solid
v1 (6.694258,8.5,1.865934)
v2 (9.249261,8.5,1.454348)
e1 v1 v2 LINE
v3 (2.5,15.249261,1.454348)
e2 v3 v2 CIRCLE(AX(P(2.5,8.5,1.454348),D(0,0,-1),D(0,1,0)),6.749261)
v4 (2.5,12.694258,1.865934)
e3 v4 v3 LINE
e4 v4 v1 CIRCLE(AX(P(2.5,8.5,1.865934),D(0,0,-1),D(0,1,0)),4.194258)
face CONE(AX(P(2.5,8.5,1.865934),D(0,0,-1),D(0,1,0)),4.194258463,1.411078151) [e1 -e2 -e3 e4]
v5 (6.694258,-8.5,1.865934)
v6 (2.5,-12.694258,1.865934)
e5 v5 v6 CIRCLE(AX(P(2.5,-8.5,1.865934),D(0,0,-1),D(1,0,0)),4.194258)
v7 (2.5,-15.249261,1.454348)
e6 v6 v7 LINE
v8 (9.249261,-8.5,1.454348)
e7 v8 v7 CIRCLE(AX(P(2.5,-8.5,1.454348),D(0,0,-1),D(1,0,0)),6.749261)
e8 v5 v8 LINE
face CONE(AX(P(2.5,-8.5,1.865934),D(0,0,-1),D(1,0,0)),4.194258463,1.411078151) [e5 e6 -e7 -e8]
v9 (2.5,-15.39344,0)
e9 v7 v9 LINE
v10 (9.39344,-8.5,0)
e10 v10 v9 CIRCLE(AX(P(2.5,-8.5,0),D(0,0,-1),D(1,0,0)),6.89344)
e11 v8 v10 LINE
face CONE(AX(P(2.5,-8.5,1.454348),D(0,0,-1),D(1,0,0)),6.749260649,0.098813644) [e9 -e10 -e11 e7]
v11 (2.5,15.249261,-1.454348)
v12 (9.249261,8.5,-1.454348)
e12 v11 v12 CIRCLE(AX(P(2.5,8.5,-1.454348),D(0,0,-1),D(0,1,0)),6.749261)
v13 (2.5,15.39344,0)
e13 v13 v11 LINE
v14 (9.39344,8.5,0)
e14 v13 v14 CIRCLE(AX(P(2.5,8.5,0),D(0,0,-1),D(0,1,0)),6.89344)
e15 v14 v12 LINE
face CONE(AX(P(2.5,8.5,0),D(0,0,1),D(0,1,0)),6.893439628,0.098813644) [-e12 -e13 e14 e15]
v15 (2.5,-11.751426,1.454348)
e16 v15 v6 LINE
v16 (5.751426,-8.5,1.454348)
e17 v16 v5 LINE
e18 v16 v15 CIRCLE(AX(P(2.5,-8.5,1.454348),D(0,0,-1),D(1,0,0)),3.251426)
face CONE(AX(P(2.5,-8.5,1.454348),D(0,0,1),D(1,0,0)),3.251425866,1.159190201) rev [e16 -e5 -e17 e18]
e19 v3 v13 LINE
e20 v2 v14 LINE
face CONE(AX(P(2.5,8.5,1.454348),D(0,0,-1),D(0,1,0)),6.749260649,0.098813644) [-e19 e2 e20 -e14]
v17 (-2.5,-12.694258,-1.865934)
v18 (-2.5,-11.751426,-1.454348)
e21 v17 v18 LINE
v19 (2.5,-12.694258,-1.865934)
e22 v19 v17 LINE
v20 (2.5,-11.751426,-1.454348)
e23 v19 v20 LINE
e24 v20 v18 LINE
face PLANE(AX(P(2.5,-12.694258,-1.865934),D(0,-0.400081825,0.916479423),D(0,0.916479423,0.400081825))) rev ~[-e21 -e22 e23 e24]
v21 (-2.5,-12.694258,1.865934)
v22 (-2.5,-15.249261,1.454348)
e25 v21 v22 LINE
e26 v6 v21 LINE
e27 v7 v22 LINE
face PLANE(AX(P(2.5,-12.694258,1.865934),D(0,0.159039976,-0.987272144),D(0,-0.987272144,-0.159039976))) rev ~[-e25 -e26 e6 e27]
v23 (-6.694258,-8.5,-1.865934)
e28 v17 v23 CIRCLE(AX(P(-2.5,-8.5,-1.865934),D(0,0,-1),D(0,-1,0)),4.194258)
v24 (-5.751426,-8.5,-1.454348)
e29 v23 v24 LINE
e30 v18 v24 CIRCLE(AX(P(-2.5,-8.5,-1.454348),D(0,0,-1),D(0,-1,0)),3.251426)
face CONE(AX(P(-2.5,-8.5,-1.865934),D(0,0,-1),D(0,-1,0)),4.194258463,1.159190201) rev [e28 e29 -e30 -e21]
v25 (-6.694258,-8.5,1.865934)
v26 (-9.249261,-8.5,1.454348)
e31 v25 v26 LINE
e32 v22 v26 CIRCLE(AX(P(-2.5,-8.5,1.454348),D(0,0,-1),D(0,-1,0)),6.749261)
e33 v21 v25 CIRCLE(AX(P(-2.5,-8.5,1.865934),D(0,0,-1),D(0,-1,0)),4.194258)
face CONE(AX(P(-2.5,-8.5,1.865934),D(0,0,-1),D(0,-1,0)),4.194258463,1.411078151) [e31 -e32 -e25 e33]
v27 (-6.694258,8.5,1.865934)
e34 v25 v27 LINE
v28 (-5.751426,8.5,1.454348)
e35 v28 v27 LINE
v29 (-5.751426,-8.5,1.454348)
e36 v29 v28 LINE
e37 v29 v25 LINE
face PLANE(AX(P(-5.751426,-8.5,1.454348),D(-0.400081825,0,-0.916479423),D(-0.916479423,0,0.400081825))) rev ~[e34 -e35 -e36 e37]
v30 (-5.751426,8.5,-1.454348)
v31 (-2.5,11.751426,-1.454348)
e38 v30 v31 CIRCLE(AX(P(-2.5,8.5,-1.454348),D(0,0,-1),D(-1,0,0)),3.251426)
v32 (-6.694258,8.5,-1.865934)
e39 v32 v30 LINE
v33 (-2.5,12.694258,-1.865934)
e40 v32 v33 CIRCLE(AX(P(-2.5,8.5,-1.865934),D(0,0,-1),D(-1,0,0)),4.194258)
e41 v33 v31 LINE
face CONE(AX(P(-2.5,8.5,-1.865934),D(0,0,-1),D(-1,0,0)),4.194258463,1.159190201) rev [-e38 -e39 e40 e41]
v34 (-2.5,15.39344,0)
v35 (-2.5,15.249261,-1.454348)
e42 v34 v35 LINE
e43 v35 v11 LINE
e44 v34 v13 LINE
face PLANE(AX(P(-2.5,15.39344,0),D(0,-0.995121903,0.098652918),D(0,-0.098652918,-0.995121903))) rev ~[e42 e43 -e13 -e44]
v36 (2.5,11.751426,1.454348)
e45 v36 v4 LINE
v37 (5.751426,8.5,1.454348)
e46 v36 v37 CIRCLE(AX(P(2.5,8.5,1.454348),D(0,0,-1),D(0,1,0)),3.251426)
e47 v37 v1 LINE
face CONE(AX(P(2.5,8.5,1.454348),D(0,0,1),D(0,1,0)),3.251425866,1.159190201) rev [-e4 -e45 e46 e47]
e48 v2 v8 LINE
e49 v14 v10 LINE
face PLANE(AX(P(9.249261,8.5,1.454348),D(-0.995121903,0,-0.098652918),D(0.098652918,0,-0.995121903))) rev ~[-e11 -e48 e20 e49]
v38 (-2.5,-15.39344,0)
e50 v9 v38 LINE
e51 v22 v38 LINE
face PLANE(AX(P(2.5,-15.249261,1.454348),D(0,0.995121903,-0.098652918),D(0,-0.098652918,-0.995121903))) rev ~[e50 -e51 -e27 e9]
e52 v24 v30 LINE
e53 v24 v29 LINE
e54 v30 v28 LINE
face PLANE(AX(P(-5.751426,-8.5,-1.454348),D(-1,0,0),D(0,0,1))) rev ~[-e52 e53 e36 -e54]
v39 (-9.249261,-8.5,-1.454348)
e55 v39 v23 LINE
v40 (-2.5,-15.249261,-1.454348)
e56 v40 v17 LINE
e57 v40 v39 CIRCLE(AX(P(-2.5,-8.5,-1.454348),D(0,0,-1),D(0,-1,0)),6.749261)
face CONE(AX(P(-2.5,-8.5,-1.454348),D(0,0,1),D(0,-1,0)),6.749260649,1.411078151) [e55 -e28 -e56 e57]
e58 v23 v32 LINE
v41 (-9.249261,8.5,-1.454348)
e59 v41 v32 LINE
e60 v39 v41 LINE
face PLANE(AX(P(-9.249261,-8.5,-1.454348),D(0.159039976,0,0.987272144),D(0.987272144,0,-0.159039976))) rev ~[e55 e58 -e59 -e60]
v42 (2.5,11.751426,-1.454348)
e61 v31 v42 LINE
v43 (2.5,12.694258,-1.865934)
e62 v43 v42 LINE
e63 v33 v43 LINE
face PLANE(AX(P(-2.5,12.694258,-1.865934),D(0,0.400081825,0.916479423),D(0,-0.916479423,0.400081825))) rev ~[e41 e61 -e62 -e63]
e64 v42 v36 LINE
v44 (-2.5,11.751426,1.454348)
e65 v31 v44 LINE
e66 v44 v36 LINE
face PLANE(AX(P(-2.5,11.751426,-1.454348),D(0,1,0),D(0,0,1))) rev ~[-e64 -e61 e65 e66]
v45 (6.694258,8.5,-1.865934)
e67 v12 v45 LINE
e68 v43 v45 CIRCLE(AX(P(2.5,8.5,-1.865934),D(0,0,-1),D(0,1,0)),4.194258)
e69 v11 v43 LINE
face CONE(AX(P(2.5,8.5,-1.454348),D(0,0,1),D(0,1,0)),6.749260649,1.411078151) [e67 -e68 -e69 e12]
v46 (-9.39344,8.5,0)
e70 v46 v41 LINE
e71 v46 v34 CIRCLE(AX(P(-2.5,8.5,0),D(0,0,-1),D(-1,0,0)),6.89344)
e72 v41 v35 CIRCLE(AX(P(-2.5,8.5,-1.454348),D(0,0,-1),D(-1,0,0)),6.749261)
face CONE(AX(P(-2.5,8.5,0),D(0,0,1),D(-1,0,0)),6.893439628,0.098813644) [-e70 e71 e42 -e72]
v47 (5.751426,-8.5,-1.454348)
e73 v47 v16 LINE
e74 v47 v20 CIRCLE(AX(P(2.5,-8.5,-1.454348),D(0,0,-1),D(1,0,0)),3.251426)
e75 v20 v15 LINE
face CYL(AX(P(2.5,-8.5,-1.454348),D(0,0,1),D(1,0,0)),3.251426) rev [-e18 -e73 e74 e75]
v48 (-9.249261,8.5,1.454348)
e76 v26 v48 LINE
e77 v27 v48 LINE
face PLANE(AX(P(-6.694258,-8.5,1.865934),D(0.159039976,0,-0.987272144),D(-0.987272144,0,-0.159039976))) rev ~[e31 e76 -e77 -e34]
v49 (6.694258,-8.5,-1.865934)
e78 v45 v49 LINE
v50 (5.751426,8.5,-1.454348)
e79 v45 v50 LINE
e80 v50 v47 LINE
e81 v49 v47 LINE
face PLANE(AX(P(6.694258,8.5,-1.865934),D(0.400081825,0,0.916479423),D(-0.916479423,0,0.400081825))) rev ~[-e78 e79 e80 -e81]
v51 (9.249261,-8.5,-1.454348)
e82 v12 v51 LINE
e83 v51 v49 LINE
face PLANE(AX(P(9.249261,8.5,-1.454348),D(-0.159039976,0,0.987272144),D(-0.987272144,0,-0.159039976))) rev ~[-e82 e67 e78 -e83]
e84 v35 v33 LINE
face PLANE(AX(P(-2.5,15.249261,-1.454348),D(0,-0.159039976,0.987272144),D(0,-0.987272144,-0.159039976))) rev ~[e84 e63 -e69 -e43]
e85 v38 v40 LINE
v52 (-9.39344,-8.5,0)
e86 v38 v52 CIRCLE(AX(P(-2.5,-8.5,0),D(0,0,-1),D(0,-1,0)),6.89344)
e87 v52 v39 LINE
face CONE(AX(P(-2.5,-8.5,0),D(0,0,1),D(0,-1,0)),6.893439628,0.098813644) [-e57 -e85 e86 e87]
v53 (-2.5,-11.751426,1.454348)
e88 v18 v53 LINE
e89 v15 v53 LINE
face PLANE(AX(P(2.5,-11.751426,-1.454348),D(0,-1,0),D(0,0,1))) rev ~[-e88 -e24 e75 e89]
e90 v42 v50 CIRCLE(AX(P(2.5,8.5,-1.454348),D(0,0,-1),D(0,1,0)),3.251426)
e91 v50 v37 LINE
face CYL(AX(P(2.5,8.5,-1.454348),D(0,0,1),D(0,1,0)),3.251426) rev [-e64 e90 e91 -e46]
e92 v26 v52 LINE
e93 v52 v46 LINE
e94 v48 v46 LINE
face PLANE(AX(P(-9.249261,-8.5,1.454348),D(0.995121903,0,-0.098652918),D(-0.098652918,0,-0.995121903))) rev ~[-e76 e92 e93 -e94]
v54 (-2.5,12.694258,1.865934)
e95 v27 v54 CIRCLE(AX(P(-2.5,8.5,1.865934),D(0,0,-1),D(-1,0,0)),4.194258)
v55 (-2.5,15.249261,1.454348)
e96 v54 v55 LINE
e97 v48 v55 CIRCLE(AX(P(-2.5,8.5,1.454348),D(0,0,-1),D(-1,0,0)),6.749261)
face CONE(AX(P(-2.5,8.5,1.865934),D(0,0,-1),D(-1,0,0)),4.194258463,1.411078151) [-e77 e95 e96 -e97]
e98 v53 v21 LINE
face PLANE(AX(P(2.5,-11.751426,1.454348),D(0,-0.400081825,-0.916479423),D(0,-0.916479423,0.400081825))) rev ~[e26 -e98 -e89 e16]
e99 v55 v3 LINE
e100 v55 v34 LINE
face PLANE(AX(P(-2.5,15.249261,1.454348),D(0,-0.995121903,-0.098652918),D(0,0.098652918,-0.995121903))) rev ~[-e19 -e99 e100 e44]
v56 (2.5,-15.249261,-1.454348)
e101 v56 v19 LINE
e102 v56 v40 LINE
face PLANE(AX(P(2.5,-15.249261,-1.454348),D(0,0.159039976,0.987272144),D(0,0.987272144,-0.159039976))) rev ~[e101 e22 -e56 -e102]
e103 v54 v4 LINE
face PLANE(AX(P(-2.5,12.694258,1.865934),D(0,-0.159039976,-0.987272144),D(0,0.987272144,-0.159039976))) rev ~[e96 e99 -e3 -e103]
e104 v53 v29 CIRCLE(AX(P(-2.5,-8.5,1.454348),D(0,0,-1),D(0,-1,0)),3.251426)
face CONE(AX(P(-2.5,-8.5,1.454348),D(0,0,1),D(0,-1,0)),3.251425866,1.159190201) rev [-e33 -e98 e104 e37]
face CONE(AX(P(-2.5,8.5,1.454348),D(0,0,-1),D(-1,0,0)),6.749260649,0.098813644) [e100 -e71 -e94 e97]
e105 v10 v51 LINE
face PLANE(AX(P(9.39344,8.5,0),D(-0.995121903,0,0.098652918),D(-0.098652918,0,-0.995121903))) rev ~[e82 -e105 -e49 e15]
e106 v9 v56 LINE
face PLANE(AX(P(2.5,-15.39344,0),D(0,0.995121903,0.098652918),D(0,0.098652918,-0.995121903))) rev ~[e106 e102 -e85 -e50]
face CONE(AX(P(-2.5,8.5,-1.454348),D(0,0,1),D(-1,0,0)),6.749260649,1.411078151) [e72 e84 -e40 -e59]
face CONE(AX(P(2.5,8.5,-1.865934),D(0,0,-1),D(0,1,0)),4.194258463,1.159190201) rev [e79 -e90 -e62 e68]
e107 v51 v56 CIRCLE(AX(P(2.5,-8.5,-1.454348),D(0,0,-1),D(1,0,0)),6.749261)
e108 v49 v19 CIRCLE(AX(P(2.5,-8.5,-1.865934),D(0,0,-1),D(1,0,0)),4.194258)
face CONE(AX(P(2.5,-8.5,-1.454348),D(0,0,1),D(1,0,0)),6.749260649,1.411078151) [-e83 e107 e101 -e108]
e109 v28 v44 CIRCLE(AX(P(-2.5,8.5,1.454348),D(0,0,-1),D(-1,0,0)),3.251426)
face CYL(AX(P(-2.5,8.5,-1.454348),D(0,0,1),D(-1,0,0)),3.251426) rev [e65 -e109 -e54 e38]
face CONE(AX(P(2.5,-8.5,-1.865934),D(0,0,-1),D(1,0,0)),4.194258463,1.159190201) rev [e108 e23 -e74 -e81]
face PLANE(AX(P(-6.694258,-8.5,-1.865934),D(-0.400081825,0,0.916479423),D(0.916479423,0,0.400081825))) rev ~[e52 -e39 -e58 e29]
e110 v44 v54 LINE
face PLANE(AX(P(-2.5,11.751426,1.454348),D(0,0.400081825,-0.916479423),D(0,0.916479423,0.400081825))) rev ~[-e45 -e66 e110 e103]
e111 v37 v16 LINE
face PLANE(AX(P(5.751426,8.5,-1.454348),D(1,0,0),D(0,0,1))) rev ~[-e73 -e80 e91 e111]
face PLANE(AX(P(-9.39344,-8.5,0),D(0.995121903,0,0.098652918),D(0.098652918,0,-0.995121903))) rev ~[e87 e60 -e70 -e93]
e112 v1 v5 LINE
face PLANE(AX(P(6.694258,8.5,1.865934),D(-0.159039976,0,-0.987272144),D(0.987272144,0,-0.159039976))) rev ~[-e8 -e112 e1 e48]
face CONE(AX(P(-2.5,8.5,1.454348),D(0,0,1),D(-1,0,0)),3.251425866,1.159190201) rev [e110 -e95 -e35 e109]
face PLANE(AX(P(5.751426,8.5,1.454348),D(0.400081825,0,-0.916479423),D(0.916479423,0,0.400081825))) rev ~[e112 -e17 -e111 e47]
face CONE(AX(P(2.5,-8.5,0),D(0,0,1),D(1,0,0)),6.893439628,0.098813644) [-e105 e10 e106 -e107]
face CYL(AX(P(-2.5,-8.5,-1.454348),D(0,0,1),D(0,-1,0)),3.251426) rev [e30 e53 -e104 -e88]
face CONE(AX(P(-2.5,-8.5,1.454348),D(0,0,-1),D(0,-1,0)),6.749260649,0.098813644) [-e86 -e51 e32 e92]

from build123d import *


# Not quite as in the source:
# - a feature names something its author has since deleted; it is built from what else it names


with BuildPart() as f2:
    # F2: sweep along a path in F0
    with BuildLine(Plane.XY) as f2_path:
        Line((-7.5, -8.5), (-7.5, 8.5))
        ThreePointArc((-7.5, 8.5), (-6.0355339059, 12.0355339059), (-2.5, 13.5))
        Line((-2.5, 13.5), (2.5, 13.5))
        ThreePointArc((2.5, 13.5), (6.0355339059, 12.0355339059), (7.5, 8.5))
        Line((7.5, 8.5), (7.5, -8.5))
        ThreePointArc((7.5, -8.5), (6.0355339059, -12.0355339059), (2.5, -13.5))
        Line((2.5, -13.5), (-2.5, -13.5))
        ThreePointArc((-2.5, -13.5), (-6.0355339059, -12.0355339059), (-7.5, -8.5))
    # F1 (on Front) → F2 (sweep)
    with BuildSketch(Plane.XZ):
        Polygon((-5.751425866, 1.454347861), (-6.6942584633, 1.8659339551), (-9.2492606491, 1.454347861), (-9.3934396282, 0), (-9.2492606491, -1.454347861), (-6.6942584633, -1.8659339551), (-5.751425866, -1.454347861), (-5.751425866, 0), align=None)
    sweep(path=f2_path.line)


solid = f2.part
